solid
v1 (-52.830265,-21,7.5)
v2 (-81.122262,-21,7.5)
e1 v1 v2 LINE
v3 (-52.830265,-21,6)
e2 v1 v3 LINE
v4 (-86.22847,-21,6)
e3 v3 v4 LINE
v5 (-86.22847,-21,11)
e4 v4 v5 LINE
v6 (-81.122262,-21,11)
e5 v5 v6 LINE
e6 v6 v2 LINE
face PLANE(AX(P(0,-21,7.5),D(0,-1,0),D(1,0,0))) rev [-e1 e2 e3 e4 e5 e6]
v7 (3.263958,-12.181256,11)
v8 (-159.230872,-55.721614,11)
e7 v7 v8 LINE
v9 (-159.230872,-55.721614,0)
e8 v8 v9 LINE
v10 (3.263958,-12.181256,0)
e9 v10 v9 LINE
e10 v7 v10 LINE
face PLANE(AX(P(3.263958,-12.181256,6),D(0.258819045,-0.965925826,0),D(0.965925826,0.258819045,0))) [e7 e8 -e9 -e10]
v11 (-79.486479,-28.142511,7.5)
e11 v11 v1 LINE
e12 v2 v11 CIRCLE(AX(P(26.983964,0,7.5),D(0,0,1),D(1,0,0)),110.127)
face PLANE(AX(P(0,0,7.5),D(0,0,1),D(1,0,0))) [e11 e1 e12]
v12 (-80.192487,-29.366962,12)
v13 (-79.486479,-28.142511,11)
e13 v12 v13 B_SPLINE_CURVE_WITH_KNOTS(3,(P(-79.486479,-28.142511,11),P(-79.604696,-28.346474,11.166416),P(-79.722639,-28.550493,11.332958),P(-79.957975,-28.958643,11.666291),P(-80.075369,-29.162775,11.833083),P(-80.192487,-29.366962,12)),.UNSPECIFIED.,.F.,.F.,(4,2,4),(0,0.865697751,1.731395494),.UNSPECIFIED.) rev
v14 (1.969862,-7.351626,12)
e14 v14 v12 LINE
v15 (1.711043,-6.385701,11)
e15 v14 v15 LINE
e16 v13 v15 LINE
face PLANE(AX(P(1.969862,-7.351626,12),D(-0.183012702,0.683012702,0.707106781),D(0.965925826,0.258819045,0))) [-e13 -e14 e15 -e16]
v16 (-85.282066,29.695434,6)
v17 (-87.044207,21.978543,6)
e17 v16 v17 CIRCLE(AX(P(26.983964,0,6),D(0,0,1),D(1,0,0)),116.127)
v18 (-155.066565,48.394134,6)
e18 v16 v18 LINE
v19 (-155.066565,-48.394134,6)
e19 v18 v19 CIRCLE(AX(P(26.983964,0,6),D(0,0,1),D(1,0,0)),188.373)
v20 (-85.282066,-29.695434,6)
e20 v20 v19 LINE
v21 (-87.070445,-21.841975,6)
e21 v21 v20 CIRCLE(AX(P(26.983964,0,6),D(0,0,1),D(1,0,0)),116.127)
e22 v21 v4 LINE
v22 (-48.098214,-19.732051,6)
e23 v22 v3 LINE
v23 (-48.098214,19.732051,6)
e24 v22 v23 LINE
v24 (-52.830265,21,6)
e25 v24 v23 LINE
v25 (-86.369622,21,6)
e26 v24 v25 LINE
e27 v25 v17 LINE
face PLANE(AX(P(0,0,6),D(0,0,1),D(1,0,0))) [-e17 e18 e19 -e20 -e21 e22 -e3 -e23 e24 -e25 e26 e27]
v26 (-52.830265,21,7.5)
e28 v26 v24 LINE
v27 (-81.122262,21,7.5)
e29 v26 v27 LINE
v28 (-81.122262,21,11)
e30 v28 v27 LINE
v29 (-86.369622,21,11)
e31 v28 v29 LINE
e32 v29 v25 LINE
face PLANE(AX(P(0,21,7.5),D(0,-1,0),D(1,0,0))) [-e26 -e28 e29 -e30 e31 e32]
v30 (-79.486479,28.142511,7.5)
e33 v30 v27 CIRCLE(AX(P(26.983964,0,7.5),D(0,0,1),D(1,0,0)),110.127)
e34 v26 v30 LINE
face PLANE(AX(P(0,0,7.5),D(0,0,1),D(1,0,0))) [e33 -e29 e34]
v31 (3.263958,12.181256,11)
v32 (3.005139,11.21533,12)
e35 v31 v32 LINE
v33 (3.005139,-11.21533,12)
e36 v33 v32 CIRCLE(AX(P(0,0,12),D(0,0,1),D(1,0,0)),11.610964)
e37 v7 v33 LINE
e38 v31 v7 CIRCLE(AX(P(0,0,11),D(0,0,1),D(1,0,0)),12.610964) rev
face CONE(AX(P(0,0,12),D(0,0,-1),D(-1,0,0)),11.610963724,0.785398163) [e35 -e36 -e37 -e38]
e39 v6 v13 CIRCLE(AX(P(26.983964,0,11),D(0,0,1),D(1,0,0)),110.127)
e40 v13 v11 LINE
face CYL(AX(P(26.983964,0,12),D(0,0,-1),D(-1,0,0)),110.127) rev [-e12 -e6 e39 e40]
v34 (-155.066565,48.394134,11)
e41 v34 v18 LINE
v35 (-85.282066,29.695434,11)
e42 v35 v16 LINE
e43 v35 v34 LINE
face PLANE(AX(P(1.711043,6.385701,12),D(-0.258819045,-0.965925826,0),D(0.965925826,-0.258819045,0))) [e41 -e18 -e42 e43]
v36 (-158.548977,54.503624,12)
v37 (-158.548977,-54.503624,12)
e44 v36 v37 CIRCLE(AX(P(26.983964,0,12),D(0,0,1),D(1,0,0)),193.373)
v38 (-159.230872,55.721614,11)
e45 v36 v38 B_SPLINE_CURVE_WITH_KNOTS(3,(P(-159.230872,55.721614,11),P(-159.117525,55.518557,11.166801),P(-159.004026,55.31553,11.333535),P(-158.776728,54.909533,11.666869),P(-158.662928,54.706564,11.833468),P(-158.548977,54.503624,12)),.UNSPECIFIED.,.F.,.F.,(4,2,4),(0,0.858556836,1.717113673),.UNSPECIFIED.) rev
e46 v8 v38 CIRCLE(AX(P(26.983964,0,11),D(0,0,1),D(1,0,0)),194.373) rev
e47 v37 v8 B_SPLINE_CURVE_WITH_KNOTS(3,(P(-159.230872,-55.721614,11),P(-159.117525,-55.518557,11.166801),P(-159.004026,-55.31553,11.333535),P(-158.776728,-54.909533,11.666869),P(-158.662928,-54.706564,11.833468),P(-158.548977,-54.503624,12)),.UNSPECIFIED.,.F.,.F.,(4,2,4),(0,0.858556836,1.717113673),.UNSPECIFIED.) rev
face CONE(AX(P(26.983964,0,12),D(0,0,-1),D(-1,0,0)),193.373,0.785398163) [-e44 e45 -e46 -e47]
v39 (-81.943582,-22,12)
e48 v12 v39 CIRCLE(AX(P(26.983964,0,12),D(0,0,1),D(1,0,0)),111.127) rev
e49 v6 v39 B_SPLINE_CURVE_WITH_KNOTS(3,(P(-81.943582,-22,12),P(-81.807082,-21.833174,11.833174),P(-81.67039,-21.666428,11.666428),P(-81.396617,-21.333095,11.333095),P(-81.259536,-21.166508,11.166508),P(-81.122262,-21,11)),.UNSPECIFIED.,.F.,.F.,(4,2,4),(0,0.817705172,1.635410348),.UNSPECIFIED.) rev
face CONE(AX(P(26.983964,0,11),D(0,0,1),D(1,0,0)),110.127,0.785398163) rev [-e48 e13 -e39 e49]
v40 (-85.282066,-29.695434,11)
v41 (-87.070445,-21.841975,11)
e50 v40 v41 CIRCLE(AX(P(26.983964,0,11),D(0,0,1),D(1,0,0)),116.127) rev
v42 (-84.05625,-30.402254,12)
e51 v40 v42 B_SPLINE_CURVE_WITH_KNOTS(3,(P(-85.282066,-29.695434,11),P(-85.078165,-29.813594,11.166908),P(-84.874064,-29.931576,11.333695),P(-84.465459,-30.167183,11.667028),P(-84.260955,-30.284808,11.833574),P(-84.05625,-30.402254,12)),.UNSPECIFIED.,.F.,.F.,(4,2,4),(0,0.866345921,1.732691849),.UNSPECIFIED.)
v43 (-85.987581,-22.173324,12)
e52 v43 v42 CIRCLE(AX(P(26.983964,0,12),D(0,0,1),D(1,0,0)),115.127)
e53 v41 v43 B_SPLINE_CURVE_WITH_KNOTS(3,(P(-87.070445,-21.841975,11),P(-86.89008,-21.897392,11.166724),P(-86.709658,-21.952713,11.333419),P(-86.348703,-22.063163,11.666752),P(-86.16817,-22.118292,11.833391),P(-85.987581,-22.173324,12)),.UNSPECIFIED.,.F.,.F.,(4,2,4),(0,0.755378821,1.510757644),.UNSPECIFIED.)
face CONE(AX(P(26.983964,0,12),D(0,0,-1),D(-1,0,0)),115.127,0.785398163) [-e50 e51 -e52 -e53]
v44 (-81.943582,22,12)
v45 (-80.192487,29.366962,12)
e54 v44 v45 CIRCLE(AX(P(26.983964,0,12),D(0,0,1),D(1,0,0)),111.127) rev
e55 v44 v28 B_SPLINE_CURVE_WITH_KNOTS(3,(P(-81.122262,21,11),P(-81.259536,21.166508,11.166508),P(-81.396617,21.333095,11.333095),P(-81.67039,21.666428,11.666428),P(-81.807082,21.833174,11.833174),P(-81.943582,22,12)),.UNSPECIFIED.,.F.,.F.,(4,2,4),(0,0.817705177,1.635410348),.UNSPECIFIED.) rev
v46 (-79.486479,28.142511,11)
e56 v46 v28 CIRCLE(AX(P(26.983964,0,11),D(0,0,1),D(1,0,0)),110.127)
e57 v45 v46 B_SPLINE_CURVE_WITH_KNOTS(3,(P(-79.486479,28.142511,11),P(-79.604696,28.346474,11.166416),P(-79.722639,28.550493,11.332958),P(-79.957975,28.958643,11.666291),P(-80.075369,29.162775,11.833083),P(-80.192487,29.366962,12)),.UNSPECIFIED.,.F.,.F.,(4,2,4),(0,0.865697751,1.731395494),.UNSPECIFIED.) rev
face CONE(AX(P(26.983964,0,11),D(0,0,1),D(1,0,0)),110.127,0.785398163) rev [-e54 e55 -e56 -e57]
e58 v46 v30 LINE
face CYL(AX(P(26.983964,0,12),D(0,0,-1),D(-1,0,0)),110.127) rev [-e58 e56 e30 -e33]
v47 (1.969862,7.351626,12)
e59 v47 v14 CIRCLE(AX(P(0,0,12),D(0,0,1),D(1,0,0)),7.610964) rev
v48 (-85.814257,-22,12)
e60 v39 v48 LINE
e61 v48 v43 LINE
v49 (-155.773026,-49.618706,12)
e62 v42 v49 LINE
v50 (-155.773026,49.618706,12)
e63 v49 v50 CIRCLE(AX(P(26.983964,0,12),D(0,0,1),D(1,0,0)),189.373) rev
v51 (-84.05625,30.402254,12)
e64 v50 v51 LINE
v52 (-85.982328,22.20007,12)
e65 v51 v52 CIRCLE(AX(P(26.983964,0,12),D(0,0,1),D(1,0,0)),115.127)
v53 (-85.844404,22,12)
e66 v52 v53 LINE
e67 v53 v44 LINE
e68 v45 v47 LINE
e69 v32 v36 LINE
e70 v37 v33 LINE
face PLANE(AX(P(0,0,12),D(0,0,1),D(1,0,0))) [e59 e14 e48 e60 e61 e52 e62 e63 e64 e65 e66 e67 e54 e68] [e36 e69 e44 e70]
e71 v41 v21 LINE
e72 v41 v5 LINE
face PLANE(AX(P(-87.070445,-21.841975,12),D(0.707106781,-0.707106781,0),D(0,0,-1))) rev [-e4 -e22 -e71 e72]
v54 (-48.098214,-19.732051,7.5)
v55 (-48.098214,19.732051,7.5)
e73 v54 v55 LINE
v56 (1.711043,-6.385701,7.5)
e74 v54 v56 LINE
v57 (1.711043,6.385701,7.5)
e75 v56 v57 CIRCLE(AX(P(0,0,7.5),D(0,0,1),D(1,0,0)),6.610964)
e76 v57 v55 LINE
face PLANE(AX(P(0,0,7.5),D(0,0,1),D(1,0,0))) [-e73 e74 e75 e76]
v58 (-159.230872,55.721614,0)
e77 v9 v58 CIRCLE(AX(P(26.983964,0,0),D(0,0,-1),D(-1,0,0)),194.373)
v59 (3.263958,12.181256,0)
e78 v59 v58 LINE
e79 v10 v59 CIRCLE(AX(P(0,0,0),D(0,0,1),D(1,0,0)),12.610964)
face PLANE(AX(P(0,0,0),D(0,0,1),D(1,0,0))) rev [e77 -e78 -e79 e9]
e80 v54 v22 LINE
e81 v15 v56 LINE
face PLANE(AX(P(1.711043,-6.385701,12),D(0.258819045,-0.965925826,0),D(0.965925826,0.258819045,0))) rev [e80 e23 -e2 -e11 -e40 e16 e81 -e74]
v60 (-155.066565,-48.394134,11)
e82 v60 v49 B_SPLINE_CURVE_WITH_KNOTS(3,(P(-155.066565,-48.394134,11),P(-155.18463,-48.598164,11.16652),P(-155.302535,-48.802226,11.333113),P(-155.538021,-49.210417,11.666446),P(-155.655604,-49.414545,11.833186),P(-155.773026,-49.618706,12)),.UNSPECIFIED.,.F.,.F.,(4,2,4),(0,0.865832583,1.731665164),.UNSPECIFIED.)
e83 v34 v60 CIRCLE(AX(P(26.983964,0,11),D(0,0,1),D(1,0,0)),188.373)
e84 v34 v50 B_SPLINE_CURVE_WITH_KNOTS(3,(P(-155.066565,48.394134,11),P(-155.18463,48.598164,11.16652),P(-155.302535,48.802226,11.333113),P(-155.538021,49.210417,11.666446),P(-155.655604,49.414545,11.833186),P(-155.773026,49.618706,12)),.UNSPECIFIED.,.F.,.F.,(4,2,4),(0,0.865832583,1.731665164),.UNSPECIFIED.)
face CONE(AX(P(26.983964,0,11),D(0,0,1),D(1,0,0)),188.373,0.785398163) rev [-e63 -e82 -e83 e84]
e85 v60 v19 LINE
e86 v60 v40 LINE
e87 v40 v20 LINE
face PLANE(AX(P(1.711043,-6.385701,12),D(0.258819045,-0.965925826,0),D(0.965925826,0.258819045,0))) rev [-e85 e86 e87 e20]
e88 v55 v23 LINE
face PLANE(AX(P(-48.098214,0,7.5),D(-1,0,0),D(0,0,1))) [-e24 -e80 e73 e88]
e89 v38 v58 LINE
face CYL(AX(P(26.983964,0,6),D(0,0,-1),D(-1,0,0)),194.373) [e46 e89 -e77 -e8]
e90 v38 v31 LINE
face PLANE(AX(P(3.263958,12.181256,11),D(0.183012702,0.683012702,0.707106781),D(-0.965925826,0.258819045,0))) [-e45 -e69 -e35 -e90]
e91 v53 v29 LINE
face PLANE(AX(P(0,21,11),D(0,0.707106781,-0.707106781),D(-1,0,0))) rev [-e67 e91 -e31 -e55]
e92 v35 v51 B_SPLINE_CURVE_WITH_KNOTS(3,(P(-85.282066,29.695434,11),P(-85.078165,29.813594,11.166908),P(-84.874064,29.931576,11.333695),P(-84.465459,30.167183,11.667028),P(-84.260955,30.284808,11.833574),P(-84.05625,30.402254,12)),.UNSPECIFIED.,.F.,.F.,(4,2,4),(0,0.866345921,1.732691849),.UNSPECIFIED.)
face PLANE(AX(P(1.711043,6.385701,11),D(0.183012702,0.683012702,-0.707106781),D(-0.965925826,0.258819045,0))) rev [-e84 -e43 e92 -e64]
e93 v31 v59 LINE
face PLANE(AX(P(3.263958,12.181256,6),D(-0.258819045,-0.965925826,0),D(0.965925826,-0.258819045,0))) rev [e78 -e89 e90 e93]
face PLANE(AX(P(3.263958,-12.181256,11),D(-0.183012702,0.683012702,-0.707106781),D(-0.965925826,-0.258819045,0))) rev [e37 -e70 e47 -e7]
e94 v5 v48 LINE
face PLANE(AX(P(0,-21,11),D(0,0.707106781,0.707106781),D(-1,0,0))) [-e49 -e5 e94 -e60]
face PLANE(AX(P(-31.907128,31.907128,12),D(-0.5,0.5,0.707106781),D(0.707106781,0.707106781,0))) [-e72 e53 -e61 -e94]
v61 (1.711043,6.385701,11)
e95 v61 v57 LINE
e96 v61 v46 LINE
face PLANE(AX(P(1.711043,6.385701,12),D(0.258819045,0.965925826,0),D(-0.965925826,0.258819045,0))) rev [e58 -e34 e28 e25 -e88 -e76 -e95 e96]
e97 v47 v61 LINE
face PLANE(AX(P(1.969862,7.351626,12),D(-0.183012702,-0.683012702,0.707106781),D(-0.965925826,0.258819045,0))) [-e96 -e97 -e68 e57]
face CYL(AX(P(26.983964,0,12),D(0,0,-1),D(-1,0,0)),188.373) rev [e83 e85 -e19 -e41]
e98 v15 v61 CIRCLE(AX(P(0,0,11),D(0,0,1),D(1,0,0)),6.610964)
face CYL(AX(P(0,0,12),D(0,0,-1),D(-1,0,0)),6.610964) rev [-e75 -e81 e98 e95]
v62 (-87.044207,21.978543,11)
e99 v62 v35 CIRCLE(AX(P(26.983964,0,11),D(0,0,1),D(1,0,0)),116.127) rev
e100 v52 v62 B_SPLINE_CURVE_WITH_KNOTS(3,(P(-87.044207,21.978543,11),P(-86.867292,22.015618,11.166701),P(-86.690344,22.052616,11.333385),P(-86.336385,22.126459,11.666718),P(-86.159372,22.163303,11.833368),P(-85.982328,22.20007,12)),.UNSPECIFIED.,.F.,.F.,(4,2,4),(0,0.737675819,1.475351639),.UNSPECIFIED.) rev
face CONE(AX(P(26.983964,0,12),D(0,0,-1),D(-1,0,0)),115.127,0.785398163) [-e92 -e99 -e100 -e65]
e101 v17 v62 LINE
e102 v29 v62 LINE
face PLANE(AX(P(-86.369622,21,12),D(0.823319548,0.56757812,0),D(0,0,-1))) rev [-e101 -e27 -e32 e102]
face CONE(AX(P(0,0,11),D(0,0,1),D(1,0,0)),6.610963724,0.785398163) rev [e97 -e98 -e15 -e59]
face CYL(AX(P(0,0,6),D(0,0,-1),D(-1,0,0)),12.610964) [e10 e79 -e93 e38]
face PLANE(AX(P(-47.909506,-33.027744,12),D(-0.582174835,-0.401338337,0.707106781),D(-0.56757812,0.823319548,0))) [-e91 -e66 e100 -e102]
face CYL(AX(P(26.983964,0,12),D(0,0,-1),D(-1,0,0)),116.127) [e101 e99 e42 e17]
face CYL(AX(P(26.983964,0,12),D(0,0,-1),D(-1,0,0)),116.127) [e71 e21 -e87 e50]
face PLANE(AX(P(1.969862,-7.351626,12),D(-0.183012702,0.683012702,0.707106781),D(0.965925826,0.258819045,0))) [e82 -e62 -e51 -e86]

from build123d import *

# Parameters (mm, degrees)
BOSS_EXTRUDE1_DEPTH = 6
BOSS_EXTRUDE2_START = 6
BOSS_EXTRUDE2_DEPTH = 6
BOSS_EXTRUDE3_DEPTH = 1.5
CUT_EXTRUDE3_DEPTH  = 6
CHAMFER1_SIZE       = 0.858848527
CHAMFER1_SIZE_2     = 1
CHAMFER2_SIZE       = 1


with BuildPart() as part:
    # Sketch3 → Boss-Extrude1 (new body)
    with BuildSketch(Plane.XY):
        with BuildLine():
            Line((3.263957589, 12.181255556), (-159.230871571, 55.721613803))
            ThreePointArc((-159.230871571, 55.721613803), (-167.389036276, 0), (-159.230871571, -55.721613803))
            Line((-159.230871571, -55.721613803), (-83.597968128, -35.455838404))
            Line((-83.597968128, -35.455838404), (3.263957589, -12.181255556))
            ThreePointArc((3.263957589, -12.181255556), (12.610963724, 0), (3.263957589, 12.181255556))
        make_face()
    extrude(amount=BOSS_EXTRUDE1_DEPTH)

    # Sketch3<3> → Boss-Extrude2 (add)
    with BuildSketch(Plane.XY.offset(BOSS_EXTRUDE2_START)):
        with BuildLine():
            ThreePointArc((3.263957589, -12.181255556), (12.610963724, 0), (3.263957589, 12.181255556))
            Line((3.263957589, 12.181255556), (-159.230871571, 55.721613803))
            ThreePointArc((-159.230871571, 55.721613803), (-167.389036276, 0), (-159.230871571, -55.721613803))
            Line((-159.230871571, -55.721613803), (-83.597968128, -35.455838404))
            Line((-83.597968128, -35.455838404), (3.263957589, -12.181255556))
        make_face()
        with BuildLine():
            Line((-85.282065581, -29.695433875), (-155.066564747, -48.39413407))
            ThreePointArc((-155.066564747, -48.39413407), (-161.389036276, 0), (-155.066564747, 48.39413407))
            Line((-155.066564747, 48.39413407), (-85.282065581, 29.695433875))
            ThreePointArc((-85.282065581, 29.695433875), (-89.143036276, 0), (-85.282065581, -29.695433875))
        make_face(mode=Mode.SUBTRACT)
        with BuildLine():
            Line((1.711043318, -6.385700598), (-79.486479098, -28.142511157))
            ThreePointArc((-79.486479098, -28.142511157), (-83.143036276, 0), (-79.486479098, 28.142511157))
            Line((-79.486479098, 28.142511157), (1.711043318, 6.385700598))
            ThreePointArc((1.711043318, 6.385700598), (6.610963724, 0), (1.711043318, -6.385700598))
        make_face(mode=Mode.SUBTRACT)
    extrude(amount=BOSS_EXTRUDE2_DEPTH)

    # Sketch4 → Boss-Extrude3 (add)
    with BuildSketch(Plane.XY.offset(6)):
        with BuildLine():
            ThreePointArc((-79.486479098, 28.142511157), (-80.363791639, 24.584864194), (-81.12226241, 21))
            Line((-81.12226241, 21), (-52.830264568, 21))
            Line((-52.830264568, 21), (-79.486479098, 28.142511157))
        make_face()
        with BuildLine():
            Line((-79.486479098, -28.142511157), (-52.830264568, -21))
            Line((-52.830264568, -21), (-81.12226241, -21))
            ThreePointArc((-81.12226241, -21), (-80.363791639, -24.584864194), (-79.486479098, -28.142511157))
        make_face()
        with BuildLine():
            Line((-48.09821376, 19.732050808), (-48.09821376, -19.732050808))
            Line((-48.09821376, -19.732050808), (1.711043318, -6.385700598))
            ThreePointArc((1.711043318, -6.385700598), (6.610963724, 0), (1.711043318, 6.385700598))
            Line((1.711043318, 6.385700598), (-48.09821376, 19.732050808))
        make_face()
    extrude(amount=BOSS_EXTRUDE3_DEPTH)

    # Sketch5 → Cut-Extrude3 (cut)
    with BuildSketch(Plane.XY.offset(6)):
        with BuildLine():
            Line((-81.12226241, 21), (-87.228470489, 21))
            ThreePointArc((-87.228470489, 21), (-89.143036276, 0), (-87.228470489, -21))
            Line((-87.228470489, -21), (-81.12226241, -21))
            ThreePointArc((-81.12226241, -21), (-83.143036276, 0), (-81.12226241, 21))
        make_face()
    extrude(amount=CUT_EXTRUDE3_DEPTH, mode=Mode.SUBTRACT)

    # Chamfer1
    # the kernel refuses this chamfer: 1, 0.858848527 mm, written as the material it takes off along each edge
    with BuildSketch(Plane(origin=(-87.228470489, 21, 6), x_dir=(0.1850514416549976, 0.9827288354075131, 0), z_dir=(0, 0, 1))) as chamfer1_piece_1:
        with BuildLine():
            Line((0.995740125, 0), (CHAMFER1_SIZE * 0.185051441724, -CHAMFER1_SIZE * 0.982728835776))
            Line((CHAMFER1_SIZE * 0.185051441724, -CHAMFER1_SIZE * 0.982728835776), (0, 0))
            ThreePointArc((0, 0), (0.511949844, 0.001066408), (0.995740125, 0))
        make_face()
    extrude(amount=8.560742024, mode=Mode.SUBTRACT)
    with BuildSketch(Plane(origin=(-87.228470489, -21, 6), x_dir=(1, 0, 0), z_dir=(0, 0, 1))) as chamfer1_piece_2:
        with BuildLine():
            Line((CHAMFER1_SIZE_2, 0), (0.158025015, -0.841974985))
            ThreePointArc((0.158025015, -0.841974985), (0.080319075, -0.432228603), (0, 0))
            Line((0, 0), (CHAMFER1_SIZE_2, 0))
        make_face()
    extrude(amount=8.571682988, mode=Mode.SUBTRACT)

    # Chamfer2
    chamfer2_edges = [part.edges().sort_by_distance(p)[0] for p in [
        (-86.244364999, -25.784214234, 12),
        (-83.67536645, -21, 12),
        (-86.706914653, 21.489271267, 12),
        (-86.649457982, -21.420987493, 12),
        (-86.228906055, 25.852006602, 12),
        (-120.174315164, -39.044783972, 12),
        (12.610963724, 0, 12),
        (-167.389036276, 0, 12),
        (-38.88771789, 17.264105877, 12),
        (-38.88771789, -17.264105877, 12),
        (-77.983456991, 33.951434679, 12),
        (-77.983456991, -33.951434679, 12),
        (-120.174315164, 39.044783972, 12),
        (-161.389036276, 0, 12),
        (6.610963724, 0, 12),
        (-80.363791639, 24.584864194, 12),
        (-80.363791639, -24.584864194, 12),
        (-83.745942186, 21, 12),
    ]]
    chamfer(chamfer2_edges, length=CHAMFER2_SIZE)


solid = part.part
